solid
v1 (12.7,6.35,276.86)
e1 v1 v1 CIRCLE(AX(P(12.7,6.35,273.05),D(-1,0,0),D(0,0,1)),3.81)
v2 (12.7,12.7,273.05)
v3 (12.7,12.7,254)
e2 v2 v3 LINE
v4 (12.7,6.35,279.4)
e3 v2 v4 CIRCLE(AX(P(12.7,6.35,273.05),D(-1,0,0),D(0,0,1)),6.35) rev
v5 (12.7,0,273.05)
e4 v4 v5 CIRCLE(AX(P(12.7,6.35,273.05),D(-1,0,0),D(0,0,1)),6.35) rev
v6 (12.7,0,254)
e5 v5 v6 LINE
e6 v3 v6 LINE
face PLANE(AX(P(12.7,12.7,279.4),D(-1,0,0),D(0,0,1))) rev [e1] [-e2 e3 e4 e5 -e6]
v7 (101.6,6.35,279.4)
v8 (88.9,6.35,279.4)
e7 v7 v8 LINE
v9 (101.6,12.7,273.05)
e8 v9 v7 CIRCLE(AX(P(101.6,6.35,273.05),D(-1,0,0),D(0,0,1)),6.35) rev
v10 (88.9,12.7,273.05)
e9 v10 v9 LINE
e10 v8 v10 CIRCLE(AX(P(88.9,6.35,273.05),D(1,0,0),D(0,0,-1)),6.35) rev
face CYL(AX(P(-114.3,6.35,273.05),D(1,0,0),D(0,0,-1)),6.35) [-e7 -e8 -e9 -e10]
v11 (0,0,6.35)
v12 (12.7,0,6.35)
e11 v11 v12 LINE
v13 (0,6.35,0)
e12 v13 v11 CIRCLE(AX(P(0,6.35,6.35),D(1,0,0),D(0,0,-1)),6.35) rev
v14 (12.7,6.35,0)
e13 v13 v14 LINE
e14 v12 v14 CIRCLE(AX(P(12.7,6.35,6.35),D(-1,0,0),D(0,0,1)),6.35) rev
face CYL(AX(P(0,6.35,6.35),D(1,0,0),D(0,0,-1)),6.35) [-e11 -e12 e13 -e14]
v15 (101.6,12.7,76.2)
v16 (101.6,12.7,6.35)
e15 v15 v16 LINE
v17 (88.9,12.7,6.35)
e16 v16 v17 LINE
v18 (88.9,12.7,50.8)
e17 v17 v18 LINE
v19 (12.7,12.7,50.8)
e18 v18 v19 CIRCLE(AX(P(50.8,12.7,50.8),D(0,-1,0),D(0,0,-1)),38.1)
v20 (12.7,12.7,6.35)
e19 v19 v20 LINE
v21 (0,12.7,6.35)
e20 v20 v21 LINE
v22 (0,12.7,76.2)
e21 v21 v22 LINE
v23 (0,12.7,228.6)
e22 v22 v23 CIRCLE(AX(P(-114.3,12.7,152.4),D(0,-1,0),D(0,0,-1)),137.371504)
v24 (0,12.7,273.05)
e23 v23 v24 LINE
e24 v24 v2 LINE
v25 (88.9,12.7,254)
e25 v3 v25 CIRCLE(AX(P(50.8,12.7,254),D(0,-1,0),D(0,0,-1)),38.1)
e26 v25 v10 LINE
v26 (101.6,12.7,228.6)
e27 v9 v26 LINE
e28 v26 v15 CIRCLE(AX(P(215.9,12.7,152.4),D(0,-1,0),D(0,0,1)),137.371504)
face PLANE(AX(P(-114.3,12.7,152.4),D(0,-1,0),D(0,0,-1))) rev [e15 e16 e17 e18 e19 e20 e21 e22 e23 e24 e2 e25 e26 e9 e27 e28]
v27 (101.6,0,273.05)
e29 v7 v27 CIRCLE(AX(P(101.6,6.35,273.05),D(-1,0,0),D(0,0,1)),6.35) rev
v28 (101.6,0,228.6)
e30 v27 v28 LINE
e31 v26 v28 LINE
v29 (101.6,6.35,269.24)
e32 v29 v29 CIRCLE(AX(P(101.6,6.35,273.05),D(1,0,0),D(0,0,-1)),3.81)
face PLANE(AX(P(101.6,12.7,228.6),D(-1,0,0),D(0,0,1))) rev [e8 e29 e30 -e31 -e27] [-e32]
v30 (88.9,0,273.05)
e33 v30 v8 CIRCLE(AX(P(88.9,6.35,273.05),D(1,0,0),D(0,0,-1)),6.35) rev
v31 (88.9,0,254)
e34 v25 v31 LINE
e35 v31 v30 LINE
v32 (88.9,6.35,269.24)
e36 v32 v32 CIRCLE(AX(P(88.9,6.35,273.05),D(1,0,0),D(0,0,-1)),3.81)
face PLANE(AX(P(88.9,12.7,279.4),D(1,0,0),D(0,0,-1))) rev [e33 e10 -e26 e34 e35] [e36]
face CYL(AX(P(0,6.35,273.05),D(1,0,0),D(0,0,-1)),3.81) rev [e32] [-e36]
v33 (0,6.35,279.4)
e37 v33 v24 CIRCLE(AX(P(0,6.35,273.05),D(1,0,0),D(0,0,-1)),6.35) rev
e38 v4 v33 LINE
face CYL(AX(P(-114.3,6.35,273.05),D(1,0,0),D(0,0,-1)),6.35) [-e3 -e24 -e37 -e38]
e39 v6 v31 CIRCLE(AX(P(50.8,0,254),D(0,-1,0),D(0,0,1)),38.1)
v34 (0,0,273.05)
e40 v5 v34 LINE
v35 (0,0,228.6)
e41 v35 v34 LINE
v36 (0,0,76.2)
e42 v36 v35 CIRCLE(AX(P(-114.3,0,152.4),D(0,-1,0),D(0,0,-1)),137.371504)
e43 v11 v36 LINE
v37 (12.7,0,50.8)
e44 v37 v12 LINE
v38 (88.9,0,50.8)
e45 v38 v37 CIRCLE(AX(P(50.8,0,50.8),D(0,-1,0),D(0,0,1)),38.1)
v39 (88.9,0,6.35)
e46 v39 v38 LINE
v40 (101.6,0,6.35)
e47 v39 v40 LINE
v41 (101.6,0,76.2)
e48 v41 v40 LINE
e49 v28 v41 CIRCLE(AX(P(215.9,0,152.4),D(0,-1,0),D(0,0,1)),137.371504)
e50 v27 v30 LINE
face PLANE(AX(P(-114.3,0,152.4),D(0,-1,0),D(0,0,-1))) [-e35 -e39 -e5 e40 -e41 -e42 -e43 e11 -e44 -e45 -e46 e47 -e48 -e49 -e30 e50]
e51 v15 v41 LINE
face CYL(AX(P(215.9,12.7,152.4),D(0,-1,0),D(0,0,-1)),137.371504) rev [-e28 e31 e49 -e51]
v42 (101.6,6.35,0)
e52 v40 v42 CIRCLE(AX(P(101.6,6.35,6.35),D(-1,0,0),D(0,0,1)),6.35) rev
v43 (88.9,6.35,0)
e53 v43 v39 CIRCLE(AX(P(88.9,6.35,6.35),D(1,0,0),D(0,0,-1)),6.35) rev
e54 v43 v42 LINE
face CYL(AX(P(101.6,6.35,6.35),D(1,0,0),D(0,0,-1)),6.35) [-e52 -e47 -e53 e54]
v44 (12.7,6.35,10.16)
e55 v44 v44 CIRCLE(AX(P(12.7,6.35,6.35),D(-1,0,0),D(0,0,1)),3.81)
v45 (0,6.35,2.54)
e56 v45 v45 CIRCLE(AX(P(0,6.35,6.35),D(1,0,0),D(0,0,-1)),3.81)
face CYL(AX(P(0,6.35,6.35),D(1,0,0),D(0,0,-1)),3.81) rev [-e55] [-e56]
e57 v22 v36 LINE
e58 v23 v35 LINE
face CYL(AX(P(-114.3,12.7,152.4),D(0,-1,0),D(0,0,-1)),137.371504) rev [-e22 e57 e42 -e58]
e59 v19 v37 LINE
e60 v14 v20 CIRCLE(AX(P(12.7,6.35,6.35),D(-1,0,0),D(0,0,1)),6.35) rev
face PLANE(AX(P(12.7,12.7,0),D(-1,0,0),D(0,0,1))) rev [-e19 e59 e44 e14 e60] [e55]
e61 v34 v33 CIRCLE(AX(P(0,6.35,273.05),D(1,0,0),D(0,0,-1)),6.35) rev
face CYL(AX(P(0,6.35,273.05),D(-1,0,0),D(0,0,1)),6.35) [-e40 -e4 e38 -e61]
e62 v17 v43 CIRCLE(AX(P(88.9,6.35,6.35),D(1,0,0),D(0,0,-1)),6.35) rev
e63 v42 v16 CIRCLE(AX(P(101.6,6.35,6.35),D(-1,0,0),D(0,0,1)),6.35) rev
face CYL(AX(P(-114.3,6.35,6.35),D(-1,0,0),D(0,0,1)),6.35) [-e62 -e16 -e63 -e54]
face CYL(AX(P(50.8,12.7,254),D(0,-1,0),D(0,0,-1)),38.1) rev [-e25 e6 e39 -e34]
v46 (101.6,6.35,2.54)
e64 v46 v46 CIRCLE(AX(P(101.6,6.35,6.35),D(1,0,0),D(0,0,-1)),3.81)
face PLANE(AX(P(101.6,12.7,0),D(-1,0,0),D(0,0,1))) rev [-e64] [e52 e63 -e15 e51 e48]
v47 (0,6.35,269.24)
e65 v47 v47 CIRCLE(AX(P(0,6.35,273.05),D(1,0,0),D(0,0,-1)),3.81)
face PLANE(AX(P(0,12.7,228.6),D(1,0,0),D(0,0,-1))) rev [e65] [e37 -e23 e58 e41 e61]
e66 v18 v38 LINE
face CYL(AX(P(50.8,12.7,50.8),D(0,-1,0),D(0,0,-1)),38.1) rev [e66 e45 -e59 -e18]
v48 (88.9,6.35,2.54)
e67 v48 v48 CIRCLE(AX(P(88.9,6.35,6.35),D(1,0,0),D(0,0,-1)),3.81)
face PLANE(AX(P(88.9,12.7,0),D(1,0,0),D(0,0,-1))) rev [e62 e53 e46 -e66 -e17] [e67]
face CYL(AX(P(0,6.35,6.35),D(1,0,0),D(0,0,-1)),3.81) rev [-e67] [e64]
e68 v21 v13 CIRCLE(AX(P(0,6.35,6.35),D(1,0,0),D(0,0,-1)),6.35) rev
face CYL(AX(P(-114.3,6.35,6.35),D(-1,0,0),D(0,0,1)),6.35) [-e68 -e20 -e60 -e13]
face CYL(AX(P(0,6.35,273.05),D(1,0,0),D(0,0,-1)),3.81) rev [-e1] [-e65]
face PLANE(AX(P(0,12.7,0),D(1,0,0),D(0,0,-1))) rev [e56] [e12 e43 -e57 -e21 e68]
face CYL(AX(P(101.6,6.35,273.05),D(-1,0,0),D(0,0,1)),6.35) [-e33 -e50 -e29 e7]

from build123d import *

# Parameters (mm, degrees)
BOSS_EXTRUDE1_DEPTH = 12.7
FILLET1_R           = 6.35
SKETCH2_R           = 3.81
CUT_EXTRUDE1_DEPTH  = 298.570512652
SKETCH3_R           = 3.81
CUT_EXTRUDE2_DEPTH  = 298.570512652


with BuildPart() as part:
    # Sketch1 → Boss-Extrude1 (new body)
    with BuildSketch(Plane(origin=(0, 0, 0), x_dir=(1, 0, 0), z_dir=(0, 1, 0))):
        with BuildLine():
            Line((0, 0), (12.7, 0))
            Line((12.7, 0), (12.7, -50.8))
            ThreePointArc((12.7, -50.8), (23.859231637, -77.740768363), (50.8, -88.9))
            ThreePointArc((50.8, -88.9), (77.740768363, -77.740768363), (88.9, -50.8))
            Line((88.9, -50.8), (88.9, 0))
            Line((88.9, 0), (101.6, 0))
            Line((101.6, 0), (101.6, -76.2))
            ThreePointArc((101.6, -76.2), (78.528496405, -152.4), (101.6, -228.6))
            Line((101.6, -228.6), (101.6, -279.4))
            Line((101.6, -279.4), (88.9, -279.4))
            Line((88.9, -279.4), (88.9, -254))
            ThreePointArc((88.9, -254), (77.740768363, -227.059231637), (50.8, -215.9))
            ThreePointArc((50.8, -215.9), (23.859231637, -227.059231637), (12.7, -254))
            Line((12.7, -254), (12.7, -279.4))
            Line((12.7, -279.4), (0, -279.4))
            Line((0, -279.4), (0, -228.6))
            ThreePointArc((0, -228.6), (23.071503595, -152.4), (0, -76.2))
            Line((0, -76.2), (0, 0))
        make_face()
    extrude(amount=BOSS_EXTRUDE1_DEPTH)

    # Fillet1
    fillet1_edges = [part.edges().sort_by_distance(p)[0] for p in [
        (95.25, 0, 0),
        (6.35, 0, 0),
        (95.25, 12.7, 0),
        (6.35, 12.7, 0),
        (6.35, 0, 279.4),
        (6.35, 12.7, 279.4),
        (95.25, 0, 279.4),
        (95.25, 12.7, 279.4),
    ]]
    fillet(fillet1_edges, radius=FILLET1_R - 0.0001)  # a hair under: the kernel refuses the full size

    # Sketch2 → Cut-Extrude1 (cut, through all)
    with BuildSketch(Plane(origin=(101.6, 0, 0), x_dir=(0, 0, -1), z_dir=(1, 0, 0))):
        with Locations((-273.05, 6.35)):
            Circle(SKETCH2_R)
    extrude(amount=-CUT_EXTRUDE1_DEPTH, mode=Mode.SUBTRACT)

    # Sketch3 → Cut-Extrude2 (cut, through all)
    with BuildSketch(Plane(origin=(101.6, 0, 0), x_dir=(0, 0, -1), z_dir=(1, 0, 0))):
        with Locations((-6.35, 6.35)):
            Circle(SKETCH3_R)
    extrude(amount=-CUT_EXTRUDE2_DEPTH, mode=Mode.SUBTRACT)


solid = part.part
